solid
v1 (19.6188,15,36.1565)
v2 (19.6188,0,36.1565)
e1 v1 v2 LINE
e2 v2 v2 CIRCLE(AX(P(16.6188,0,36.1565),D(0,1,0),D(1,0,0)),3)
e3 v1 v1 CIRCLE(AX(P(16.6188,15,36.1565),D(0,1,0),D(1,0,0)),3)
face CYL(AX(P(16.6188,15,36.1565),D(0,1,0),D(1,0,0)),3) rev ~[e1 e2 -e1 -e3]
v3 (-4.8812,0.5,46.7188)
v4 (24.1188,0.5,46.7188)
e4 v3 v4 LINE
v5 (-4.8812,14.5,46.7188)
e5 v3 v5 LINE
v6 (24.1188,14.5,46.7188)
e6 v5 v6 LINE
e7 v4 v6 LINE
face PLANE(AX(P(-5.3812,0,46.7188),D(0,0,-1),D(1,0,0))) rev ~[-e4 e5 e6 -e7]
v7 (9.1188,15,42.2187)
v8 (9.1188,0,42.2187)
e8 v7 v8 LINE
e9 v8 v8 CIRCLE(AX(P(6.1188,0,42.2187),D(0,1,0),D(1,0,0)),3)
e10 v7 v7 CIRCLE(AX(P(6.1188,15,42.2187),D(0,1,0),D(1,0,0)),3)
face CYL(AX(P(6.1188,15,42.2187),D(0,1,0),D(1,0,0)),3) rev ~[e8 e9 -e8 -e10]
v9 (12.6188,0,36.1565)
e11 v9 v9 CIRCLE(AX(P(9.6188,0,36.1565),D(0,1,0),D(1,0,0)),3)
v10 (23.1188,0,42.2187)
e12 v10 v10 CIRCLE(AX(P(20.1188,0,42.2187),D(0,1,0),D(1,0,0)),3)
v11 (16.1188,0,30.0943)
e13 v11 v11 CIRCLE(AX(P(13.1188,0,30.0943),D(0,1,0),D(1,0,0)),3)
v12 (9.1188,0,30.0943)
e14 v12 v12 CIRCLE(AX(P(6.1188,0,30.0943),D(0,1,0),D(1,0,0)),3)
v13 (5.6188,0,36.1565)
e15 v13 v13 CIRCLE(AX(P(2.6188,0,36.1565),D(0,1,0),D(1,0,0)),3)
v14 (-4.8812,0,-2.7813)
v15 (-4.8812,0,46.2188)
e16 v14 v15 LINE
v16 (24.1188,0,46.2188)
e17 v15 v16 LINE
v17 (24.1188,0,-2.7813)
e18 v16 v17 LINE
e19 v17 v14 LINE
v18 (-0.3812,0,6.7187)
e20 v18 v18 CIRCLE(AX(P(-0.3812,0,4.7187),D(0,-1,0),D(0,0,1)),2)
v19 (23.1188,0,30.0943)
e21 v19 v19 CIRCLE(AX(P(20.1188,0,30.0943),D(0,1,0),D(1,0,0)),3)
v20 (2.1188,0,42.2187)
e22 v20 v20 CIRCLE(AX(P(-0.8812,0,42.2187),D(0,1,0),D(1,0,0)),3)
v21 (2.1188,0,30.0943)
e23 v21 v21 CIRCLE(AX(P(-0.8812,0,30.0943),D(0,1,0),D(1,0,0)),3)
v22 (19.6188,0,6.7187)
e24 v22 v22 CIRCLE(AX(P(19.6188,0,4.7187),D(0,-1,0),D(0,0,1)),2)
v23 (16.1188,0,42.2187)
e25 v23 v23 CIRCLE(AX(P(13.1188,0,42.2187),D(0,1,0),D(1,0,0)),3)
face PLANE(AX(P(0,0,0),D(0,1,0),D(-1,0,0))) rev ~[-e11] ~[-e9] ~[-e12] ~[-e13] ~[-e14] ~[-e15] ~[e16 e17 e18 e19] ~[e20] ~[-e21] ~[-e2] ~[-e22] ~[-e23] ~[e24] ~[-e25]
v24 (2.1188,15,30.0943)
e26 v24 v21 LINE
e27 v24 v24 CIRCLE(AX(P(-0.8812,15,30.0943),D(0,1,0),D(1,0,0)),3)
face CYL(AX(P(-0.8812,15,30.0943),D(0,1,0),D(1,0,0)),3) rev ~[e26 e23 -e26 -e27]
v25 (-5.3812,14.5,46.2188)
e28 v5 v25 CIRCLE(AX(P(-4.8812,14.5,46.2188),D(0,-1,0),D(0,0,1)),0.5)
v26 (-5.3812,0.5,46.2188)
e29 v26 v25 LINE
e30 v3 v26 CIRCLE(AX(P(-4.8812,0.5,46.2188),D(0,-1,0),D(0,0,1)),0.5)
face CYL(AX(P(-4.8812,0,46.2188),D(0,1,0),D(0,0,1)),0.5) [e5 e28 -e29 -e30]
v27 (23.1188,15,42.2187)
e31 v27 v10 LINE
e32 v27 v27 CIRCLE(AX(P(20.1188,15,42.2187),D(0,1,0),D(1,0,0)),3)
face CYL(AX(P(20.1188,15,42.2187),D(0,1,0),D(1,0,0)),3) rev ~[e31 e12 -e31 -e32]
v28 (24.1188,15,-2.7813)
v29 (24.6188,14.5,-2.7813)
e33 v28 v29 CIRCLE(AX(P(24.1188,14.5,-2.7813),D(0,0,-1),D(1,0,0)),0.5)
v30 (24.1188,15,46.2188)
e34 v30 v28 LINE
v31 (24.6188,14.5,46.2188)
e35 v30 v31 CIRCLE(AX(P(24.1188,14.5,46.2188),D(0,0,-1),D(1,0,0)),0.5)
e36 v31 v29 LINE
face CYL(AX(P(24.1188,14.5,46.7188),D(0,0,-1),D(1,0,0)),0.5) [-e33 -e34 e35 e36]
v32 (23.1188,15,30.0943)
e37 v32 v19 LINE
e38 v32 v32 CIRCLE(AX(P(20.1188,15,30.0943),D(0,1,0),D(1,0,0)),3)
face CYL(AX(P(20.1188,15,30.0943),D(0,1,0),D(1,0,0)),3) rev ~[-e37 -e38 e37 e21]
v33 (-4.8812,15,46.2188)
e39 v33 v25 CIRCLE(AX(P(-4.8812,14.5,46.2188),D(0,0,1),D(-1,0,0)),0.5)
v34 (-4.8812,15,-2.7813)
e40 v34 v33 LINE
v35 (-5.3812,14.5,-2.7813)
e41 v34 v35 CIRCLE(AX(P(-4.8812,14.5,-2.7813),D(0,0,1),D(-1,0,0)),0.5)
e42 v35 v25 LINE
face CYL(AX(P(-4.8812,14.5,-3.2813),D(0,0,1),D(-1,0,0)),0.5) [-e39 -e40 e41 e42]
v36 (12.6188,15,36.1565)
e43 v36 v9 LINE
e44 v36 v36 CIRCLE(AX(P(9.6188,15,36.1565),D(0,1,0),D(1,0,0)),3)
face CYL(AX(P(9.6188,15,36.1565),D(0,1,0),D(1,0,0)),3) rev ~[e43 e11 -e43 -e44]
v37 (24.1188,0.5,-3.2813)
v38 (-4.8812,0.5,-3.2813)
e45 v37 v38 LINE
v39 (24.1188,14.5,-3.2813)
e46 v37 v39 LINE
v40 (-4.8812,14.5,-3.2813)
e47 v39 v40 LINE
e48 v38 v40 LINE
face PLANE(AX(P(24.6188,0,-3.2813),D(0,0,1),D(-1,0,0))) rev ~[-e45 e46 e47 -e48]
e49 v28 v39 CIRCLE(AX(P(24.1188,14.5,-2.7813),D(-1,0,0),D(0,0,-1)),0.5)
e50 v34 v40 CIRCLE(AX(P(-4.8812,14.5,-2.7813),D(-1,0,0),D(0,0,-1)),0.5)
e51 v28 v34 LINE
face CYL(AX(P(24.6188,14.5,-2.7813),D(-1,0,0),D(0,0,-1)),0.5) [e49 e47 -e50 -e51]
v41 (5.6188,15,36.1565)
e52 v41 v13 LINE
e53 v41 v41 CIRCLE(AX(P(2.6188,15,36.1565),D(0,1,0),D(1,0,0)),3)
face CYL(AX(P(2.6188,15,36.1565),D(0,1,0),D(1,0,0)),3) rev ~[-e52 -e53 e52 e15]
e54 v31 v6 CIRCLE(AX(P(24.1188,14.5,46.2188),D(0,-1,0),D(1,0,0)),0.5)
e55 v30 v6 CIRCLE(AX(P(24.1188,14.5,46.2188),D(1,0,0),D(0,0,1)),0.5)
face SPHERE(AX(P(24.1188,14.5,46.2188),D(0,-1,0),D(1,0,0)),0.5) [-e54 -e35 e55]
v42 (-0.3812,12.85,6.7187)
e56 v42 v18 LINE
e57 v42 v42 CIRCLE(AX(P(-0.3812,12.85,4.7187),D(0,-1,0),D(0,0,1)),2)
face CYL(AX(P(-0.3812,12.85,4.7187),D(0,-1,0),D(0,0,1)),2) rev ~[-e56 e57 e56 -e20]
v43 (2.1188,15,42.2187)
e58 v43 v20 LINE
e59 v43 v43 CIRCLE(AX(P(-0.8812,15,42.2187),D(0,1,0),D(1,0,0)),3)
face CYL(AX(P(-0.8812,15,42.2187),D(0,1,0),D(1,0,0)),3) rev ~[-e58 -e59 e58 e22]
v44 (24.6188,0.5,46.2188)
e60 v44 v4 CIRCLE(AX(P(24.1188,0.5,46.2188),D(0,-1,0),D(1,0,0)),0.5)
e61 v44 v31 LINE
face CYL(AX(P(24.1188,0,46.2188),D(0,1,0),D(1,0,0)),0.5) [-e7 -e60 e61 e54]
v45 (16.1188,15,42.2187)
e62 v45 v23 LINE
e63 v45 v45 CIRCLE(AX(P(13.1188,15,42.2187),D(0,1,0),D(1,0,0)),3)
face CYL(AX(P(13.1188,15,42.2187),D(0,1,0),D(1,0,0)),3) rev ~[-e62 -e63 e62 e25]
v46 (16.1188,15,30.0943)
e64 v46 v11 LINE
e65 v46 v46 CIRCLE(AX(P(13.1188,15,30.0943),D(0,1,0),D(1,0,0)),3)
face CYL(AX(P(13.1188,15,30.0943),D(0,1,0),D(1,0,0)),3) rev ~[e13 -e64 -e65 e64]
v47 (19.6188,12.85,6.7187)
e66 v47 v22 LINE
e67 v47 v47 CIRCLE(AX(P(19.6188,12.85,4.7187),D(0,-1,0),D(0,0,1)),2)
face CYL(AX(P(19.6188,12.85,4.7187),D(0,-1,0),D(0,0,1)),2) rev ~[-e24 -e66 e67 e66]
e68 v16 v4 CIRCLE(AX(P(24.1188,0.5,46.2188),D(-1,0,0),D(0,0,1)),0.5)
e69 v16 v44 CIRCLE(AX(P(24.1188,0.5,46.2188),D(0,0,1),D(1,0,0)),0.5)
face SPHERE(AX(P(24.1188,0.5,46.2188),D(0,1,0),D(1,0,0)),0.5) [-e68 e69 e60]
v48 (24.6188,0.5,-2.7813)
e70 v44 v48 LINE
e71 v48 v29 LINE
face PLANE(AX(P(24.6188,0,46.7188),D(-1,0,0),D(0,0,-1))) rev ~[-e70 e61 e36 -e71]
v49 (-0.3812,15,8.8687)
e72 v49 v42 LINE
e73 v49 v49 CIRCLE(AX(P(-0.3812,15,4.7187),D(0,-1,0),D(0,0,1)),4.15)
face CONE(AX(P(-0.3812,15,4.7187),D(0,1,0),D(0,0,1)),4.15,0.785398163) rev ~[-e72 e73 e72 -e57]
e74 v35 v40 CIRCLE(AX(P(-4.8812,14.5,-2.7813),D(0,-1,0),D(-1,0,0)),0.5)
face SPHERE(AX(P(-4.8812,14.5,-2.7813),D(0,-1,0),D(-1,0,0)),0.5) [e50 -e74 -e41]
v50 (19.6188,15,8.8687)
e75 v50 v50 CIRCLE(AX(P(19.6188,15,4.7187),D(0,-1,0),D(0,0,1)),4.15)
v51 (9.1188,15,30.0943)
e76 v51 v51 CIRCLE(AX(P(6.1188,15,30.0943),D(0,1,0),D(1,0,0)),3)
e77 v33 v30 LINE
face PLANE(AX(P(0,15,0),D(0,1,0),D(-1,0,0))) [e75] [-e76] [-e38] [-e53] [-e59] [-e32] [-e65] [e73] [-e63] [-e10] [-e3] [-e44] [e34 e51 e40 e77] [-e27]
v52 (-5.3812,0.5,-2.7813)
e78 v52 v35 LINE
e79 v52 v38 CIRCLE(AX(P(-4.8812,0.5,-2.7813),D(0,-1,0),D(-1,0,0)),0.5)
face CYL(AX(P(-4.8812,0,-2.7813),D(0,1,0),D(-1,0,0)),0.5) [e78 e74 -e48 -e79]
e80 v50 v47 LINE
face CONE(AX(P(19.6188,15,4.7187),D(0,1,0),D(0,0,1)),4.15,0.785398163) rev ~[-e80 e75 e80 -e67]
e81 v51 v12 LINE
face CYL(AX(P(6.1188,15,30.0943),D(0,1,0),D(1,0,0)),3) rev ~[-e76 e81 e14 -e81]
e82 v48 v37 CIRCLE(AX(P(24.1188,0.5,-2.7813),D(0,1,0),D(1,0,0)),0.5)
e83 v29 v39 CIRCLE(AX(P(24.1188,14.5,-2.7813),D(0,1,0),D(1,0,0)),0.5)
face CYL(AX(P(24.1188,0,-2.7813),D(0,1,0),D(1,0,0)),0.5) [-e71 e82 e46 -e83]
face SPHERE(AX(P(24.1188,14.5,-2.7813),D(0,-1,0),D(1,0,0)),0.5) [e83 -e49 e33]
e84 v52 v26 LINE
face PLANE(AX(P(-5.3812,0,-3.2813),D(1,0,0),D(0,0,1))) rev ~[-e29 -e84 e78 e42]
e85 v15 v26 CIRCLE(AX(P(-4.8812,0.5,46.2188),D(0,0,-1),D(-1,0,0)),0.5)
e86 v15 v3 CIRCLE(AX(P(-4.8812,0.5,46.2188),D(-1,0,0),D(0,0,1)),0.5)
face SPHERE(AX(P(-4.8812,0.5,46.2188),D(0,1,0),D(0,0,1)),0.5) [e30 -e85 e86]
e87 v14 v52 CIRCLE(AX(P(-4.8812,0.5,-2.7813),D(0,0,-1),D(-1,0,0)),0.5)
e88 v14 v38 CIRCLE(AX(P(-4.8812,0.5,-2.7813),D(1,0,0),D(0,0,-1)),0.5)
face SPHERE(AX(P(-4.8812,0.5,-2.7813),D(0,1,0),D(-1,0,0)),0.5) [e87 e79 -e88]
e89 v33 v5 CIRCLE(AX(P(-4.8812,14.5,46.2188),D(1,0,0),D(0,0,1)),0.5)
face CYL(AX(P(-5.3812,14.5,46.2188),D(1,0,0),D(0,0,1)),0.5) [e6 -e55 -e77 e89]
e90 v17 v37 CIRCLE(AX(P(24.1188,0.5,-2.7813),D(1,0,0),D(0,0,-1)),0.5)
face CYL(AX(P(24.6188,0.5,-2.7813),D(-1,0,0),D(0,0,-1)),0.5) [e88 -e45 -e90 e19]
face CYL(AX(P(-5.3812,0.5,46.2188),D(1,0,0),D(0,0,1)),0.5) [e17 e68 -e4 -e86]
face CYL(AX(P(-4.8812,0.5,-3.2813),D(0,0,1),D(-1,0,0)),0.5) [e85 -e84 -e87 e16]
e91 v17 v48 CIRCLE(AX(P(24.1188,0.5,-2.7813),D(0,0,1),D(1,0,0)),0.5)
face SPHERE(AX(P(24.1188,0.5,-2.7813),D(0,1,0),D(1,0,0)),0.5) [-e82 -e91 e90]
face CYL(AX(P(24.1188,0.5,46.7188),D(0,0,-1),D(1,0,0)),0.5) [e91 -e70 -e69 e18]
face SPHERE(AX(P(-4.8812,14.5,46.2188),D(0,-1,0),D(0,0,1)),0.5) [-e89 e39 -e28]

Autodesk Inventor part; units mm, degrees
ref_plane "YZ Plane" through (0, 0, 0) normal (1, 0, 0) x (0, 1, 0)
ref_plane "XZ Plane" through (0, 0, 0) normal (0, 1, 0) x (-1, 0, 0)
ref_plane "XY Plane" through (0, 0, 0) normal (0, 0, 1) x (1, 0, 0)
sketch "Skizze1" plane through (0, 0, 0) normal (0, 1, 0) x (-1, 0, 0)
  line L0 (-24.6188, -3.2813) -> (5.3812, -3.2813)
  line L1 (5.3812, -3.2813) -> (5.3812, 46.7188)
  line L2 (5.3812, 46.7188) -> (-24.6188, 46.7188)
  line L3 (-24.6188, 46.7188) -> (-24.6188, -3.2813)
  line L4 (-24.6188, -3.2813) -> (5.3812, 46.7188) construction
  line L5 (5.3812, -3.2813) -> (-24.6188, 46.7188) construction
  point P0 (0, 0)
  point P1 (-9.6188, 21.7188)
  dimension "d5" = 50
  dimension "d7" = 30
extrude "Extrusion1" add sketch "Skizze1" along normal blind 15
fillet "Rundung1" radius 0.5 12 edges at (24.6188, 7.5, 46.7188) (24.6188, 7.5, -3.2813) (24.6188, 0, 21.7188) (24.6188, 15, 21.7188) (-5.3812, 7.5, 46.7188) (9.6188, 0, 46.7188) (9.6188, 15, 46.7188) (-5.3812, 7.5, -3.2813) (-5.3812, 0, 21.7187) (-5.3812, 15, 21.7187) (9.6188, 0, -3.2813) (9.6188, 15, -3.2813)
sketch "Skizze2" plane through (-4.8812, 15, -2.7813) normal (0, 1, 0) x (1, 0, 0)
  line L0 (29, -49) -> (0, -49) projected
  circle A0 centre (25, -45) radius 3
  circle A1 centre (21.5, -38.9378) radius 3
  line L1 (29.5, -49) -> (29.5, 0) construction
  line L2 (0, -49.5) -> (29, -49.5) construction
  circle A2 centre (18, -45) radius 3
  circle A3 centre (11, -45) radius 3
  circle A4 centre (4, -45) radius 3
  circle A5 centre (25, -32.8756) radius 3
  circle A6 centre (14.5, -38.9378) radius 3
  circle A7 centre (7.5, -38.9378) radius 3
  circle A8 centre (18, -32.8756) radius 3
  circle A9 centre (11, -32.8756) radius 3
  circle A10 centre (4, -32.8756) radius 3
  point P0 (4.8812, -2.7813)
  dimension "d9" = 6
  dimension "d66" = 7
  dimension "d81" = 4.5
  dimension "d82" = 4.5
  dimension "d86" = 7
  dimension "d93" = 7
  dimension "d112" = 0
  dimension "d113" = 1
  dimension "d115" = 1
  dimension "d116" = 1
  dimension "d117" = 6.0622
extrude "Extrusion2" cut sketch "Skizze2" against normal through all
sketch "Skizze3" plane through (0, 15, 0) normal (0, 1, 0) x (1, 0, 0)
  circle A0 centre (-0.3812, -4.7187) radius 2
  circle A1 centre (19.6188, -4.7187) radius 2
  line L0 (24.1188, 3.2813) -> (-4.8812, 3.2813) projected
  line L1 (24.6188, -46.2187) -> (24.6188, 2.7813) projected
  line L2 (-5.3812, 2.7813) -> (-5.3812, -46.2188) projected
  point P0 (0, 0)
  dimension "d40" = 4
  dimension "d43" = 4
  dimension "d105" = 8
  dimension "d106" = 8
  dimension "d107" = 5
  dimension "d108" = 5
  dimension "d118" = 20
hole "Bohrung1" at (-0.3812, 15, 4.7187) at (19.6188, 15, 4.7187) direction (0, -1, 0) diameter 4 end through all countersink diameter 8.3 countersink angle 90
properties part number "Schlauchhalter"
